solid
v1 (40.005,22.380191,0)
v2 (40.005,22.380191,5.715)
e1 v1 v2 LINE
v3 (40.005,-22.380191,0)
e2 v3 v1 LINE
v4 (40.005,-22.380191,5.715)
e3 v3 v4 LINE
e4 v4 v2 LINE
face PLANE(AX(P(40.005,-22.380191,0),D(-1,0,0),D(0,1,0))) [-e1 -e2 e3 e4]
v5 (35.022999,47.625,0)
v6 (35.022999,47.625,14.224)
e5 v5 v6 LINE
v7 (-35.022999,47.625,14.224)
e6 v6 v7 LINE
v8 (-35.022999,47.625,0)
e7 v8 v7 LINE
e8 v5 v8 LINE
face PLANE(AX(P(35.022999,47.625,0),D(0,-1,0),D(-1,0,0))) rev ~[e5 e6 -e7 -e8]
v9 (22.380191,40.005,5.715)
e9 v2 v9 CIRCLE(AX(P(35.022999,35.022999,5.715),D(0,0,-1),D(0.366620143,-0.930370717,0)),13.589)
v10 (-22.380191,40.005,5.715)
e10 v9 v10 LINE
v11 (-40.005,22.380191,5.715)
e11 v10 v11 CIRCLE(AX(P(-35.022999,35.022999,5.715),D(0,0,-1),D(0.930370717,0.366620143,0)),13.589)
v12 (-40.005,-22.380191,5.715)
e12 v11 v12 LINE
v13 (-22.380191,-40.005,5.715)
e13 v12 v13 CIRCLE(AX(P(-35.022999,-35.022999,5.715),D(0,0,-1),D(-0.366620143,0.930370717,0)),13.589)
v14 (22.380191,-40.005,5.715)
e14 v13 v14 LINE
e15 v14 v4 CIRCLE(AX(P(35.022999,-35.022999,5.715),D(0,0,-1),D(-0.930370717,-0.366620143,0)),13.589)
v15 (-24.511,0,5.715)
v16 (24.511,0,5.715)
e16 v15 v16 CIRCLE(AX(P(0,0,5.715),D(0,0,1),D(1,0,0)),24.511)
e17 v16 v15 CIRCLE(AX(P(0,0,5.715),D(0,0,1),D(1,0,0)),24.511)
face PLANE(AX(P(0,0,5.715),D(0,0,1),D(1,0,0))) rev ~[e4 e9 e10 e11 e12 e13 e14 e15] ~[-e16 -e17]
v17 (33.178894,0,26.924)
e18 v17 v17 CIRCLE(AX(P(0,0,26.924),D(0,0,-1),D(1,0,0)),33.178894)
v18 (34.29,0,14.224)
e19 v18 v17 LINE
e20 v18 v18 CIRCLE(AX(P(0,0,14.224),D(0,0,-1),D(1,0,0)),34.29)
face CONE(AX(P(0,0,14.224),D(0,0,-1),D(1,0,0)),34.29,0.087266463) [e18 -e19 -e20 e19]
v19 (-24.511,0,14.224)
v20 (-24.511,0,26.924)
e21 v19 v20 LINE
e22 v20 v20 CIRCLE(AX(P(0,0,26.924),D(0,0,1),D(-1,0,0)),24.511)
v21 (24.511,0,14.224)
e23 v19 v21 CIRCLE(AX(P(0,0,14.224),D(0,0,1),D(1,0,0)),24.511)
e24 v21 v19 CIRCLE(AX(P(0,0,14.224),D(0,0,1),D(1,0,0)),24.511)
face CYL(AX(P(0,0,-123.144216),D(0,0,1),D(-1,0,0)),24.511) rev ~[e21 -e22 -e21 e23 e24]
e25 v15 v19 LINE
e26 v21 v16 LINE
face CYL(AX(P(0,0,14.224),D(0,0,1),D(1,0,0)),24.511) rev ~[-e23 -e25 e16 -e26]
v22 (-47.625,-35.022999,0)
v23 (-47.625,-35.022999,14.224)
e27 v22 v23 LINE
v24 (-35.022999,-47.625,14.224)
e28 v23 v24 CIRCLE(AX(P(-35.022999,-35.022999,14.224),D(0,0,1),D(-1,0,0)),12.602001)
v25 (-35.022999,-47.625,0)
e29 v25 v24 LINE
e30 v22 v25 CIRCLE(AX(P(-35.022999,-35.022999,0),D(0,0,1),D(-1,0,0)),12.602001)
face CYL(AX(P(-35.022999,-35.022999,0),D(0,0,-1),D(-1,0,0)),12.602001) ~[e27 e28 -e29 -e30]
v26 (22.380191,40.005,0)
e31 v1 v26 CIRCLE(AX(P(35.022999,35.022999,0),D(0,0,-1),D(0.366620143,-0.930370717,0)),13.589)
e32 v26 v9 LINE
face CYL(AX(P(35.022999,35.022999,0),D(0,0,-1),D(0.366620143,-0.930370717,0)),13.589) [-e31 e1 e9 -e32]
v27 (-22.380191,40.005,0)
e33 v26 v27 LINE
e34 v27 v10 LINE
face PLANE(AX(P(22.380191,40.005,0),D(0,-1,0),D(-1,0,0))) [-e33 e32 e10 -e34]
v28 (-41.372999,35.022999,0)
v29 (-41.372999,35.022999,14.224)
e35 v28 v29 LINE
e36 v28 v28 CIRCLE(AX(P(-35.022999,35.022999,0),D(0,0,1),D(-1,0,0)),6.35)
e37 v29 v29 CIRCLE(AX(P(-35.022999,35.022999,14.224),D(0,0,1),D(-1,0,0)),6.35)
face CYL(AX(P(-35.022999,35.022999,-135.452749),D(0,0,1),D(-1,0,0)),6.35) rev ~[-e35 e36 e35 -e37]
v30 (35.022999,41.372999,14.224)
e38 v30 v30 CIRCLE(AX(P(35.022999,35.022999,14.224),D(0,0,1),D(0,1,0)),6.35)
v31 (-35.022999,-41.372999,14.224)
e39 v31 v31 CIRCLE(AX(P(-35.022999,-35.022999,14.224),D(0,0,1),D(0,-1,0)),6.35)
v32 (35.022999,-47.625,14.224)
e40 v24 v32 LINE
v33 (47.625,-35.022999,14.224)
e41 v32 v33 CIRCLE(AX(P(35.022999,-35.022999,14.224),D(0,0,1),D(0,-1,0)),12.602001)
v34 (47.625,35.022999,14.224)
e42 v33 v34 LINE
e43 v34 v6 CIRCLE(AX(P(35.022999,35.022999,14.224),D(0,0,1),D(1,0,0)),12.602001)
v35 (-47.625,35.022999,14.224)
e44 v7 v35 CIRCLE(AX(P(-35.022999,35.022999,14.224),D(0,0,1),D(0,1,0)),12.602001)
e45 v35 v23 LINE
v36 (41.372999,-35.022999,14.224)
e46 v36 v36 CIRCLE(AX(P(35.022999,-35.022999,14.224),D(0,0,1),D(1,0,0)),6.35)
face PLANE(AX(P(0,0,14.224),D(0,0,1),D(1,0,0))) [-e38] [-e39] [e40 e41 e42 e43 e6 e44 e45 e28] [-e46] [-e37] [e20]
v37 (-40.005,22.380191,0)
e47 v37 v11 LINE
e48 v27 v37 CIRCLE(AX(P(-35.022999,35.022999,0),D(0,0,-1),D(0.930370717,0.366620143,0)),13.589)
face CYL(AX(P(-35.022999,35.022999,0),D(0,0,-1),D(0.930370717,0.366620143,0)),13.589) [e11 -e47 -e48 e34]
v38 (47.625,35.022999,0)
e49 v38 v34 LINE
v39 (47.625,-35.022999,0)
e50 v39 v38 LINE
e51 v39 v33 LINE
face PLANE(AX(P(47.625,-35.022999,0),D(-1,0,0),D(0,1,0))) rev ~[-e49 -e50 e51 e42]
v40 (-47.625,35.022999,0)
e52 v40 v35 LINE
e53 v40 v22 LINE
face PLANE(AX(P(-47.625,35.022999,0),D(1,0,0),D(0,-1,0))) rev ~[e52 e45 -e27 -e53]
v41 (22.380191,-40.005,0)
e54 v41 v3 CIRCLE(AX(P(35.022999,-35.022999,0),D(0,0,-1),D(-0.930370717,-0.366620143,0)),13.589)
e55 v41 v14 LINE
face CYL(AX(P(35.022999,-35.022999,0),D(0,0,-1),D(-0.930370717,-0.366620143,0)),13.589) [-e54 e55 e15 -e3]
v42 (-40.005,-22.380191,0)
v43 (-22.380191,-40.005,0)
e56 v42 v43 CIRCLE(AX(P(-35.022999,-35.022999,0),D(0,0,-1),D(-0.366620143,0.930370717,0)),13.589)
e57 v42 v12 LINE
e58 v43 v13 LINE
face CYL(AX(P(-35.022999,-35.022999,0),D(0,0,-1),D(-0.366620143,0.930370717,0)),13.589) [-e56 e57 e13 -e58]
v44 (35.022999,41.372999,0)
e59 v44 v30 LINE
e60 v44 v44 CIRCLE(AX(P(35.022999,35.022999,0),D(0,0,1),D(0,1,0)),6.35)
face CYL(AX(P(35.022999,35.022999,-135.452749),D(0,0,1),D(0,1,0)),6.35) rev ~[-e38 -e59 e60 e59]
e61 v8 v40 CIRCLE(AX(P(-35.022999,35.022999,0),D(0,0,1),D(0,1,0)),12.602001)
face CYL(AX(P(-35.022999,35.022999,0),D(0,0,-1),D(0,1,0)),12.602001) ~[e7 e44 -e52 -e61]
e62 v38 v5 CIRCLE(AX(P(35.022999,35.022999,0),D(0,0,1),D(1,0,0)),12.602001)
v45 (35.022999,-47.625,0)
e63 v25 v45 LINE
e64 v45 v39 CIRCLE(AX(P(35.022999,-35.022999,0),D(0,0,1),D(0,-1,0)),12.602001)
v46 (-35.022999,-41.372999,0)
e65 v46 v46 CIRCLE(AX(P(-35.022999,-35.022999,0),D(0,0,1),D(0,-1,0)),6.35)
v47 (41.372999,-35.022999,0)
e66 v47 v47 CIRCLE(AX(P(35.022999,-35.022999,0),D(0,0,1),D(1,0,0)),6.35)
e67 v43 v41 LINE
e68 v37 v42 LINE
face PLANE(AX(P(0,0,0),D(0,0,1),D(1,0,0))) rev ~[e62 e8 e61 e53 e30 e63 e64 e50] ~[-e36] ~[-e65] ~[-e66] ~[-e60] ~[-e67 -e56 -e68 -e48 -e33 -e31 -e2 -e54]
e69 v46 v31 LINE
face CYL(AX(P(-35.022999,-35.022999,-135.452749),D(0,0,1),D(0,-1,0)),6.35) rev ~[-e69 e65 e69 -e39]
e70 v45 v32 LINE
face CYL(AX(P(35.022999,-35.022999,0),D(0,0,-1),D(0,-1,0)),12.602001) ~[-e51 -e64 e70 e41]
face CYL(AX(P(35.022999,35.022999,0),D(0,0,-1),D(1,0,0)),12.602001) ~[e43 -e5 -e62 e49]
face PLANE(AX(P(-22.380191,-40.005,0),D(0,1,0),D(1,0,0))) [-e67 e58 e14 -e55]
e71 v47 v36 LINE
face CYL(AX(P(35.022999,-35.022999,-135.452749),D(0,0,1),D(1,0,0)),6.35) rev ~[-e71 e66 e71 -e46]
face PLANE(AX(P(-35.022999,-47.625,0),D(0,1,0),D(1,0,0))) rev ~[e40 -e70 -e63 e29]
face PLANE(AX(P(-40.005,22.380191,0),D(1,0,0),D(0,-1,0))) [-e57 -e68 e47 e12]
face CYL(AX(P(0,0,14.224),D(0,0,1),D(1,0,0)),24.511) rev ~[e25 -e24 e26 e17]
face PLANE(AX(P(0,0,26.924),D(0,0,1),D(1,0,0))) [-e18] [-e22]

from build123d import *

# Parameters (mm, degrees)
F1_DEPTH        = 14.224
F2_DEPTH        = 5.715
F3_D            = 12.7
F3_COPIES_COUNT = 4
F5_R            = 34.29
F6_DEPTH        = 12.7
F6_TAPER        = 5
F7_D            = 49.022
F7_DEPTH        = 14.225
F8_D            = 49.022


# Not quite as in the source:
# - a pattern or mirror of a feature is missing from the dataset's text; its kind, count and spacing are read off the source's solid


with BuildPart() as f1:
    # F0 (on Top) → F1 (new body)
    with BuildSketch(Plane.XY):
        with BuildLine():
            Line((35.0229988722, 47.625), (-35.0229988722, 47.625))
            ThreePointArc((-35.0229988722, 47.625), (-43.9339593262, 43.9339593262), (-47.625, 35.0229988722))
            Line((-47.625, 35.0229988722), (-47.625, -35.0229988722))
            ThreePointArc((-47.625, -35.0229988722), (-43.9339593262, -43.9339593262), (-35.0229988722, -47.625))
            Line((-35.0229988722, -47.625), (35.0229988722, -47.625))
            ThreePointArc((35.0229988722, -47.625), (43.9339593262, -43.9339593262), (47.625, -35.0229988722))
            Line((47.625, -35.0229988722), (47.625, 35.0229988722))
            ThreePointArc((47.625, 35.0229988722), (43.9339593262, 43.9339593262), (35.0229988722, 47.625))
        make_face()
        with BuildLine():
            Line((22.3801912029, -40.005), (-22.3801912029, -40.005))
            ThreePointArc((-22.3801912029, -40.005), (-25.4141248226, -25.4141248226), (-40.005, -22.3801912029))
            Line((-40.005, -22.3801912029), (-40.005, 22.3801912029))
            ThreePointArc((-40.005, 22.3801912029), (-25.4141248226, 25.4141248226), (-22.3801912029, 40.005))
            Line((-22.3801912029, 40.005), (22.3801912029, 40.005))
            ThreePointArc((22.3801912029, 40.005), (25.4141248226, 25.4141248226), (40.005, 22.3801912029))
            Line((40.005, 22.3801912029), (40.005, -22.3801912029))
            ThreePointArc((40.005, -22.3801912029), (25.4141248226, -25.4141248226), (22.3801912029, -40.005))
        make_face(mode=Mode.SUBTRACT)
        with BuildLine():
            ThreePointArc((-40.005, -22.3801912029), (-25.4141248226, -25.4141248226), (-22.3801912029, -40.005))
            Line((-22.3801912029, -40.005), (22.3801912029, -40.005))
            ThreePointArc((22.3801912029, -40.005), (25.4141248226, -25.4141248226), (40.005, -22.3801912029))
            Line((40.005, -22.3801912029), (40.005, 22.3801912029))
            ThreePointArc((40.005, 22.3801912029), (25.4141248226, 25.4141248226), (22.3801912029, 40.005))
            Line((22.3801912029, 40.005), (-22.3801912029, 40.005))
            ThreePointArc((-22.3801912029, 40.005), (-25.4141248226, 25.4141248226), (-40.005, 22.3801912029))
            Line((-40.005, 22.3801912029), (-40.005, -22.3801912029))
        make_face()
    extrude(amount=F1_DEPTH)

    # F0 (on Top) → F2 (cut)
    with BuildSketch(Plane.XY):
        with BuildLine():
            ThreePointArc((-40.005, -22.3801912029), (-25.4141248226, -25.4141248226), (-22.3801912029, -40.005))
            Line((-22.3801912029, -40.005), (22.3801912029, -40.005))
            ThreePointArc((22.3801912029, -40.005), (25.4141248226, -25.4141248226), (40.005, -22.3801912029))
            Line((40.005, -22.3801912029), (40.005, 22.3801912029))
            ThreePointArc((40.005, 22.3801912029), (25.4141248226, 25.4141248226), (22.3801912029, 40.005))
            Line((22.3801912029, 40.005), (-22.3801912029, 40.005))
            ThreePointArc((-22.3801912029, 40.005), (-25.4141248226, 25.4141248226), (-40.005, 22.3801912029))
            Line((-40.005, 22.3801912029), (-40.005, -22.3801912029))
        make_face()
    extrude(amount=F2_DEPTH, mode=Mode.SUBTRACT)

    # F3 (through all)
    with Locations(Plane(origin=(0, 0, 0), x_dir=(1, 0, 0), z_dir=(0, 0, -1))):
        with Locations((-35.0229988722, -35.0229988722)):
            f3 = Hole(F3_D / 2)

    # F3_copies: F3 ×4 about axis
    f3_copies_axis = Axis((0, 0, 0), (0, 0, 1))
    for i in range(1, F3_COPIES_COUNT):
        add(f3.rotate(f3_copies_axis, i * 360 / F3_COPIES_COUNT), mode=Mode.SUBTRACT)

    # F5 (on face) → F6 (join)
    with BuildSketch(Plane.XY.offset(14.224)):
        Circle(F5_R)
    extrude(amount=F6_DEPTH, taper=F6_TAPER)

    # F7 (through all, one way)
    with BuildSketch(Plane.XY.offset(14.224)):
        with Locations((0, 0)):
            Circle(F7_D / 2)
    extrude(amount=-F7_DEPTH, mode=Mode.SUBTRACT)

    # F8 (through all)
    with Locations(Plane(origin=(0, 0, 14.224), x_dir=(1, 0, 0), z_dir=(0, 0, -1))):
        with Locations((0, 0)):
            Hole(F8_D / 2)


solid = f1.part
